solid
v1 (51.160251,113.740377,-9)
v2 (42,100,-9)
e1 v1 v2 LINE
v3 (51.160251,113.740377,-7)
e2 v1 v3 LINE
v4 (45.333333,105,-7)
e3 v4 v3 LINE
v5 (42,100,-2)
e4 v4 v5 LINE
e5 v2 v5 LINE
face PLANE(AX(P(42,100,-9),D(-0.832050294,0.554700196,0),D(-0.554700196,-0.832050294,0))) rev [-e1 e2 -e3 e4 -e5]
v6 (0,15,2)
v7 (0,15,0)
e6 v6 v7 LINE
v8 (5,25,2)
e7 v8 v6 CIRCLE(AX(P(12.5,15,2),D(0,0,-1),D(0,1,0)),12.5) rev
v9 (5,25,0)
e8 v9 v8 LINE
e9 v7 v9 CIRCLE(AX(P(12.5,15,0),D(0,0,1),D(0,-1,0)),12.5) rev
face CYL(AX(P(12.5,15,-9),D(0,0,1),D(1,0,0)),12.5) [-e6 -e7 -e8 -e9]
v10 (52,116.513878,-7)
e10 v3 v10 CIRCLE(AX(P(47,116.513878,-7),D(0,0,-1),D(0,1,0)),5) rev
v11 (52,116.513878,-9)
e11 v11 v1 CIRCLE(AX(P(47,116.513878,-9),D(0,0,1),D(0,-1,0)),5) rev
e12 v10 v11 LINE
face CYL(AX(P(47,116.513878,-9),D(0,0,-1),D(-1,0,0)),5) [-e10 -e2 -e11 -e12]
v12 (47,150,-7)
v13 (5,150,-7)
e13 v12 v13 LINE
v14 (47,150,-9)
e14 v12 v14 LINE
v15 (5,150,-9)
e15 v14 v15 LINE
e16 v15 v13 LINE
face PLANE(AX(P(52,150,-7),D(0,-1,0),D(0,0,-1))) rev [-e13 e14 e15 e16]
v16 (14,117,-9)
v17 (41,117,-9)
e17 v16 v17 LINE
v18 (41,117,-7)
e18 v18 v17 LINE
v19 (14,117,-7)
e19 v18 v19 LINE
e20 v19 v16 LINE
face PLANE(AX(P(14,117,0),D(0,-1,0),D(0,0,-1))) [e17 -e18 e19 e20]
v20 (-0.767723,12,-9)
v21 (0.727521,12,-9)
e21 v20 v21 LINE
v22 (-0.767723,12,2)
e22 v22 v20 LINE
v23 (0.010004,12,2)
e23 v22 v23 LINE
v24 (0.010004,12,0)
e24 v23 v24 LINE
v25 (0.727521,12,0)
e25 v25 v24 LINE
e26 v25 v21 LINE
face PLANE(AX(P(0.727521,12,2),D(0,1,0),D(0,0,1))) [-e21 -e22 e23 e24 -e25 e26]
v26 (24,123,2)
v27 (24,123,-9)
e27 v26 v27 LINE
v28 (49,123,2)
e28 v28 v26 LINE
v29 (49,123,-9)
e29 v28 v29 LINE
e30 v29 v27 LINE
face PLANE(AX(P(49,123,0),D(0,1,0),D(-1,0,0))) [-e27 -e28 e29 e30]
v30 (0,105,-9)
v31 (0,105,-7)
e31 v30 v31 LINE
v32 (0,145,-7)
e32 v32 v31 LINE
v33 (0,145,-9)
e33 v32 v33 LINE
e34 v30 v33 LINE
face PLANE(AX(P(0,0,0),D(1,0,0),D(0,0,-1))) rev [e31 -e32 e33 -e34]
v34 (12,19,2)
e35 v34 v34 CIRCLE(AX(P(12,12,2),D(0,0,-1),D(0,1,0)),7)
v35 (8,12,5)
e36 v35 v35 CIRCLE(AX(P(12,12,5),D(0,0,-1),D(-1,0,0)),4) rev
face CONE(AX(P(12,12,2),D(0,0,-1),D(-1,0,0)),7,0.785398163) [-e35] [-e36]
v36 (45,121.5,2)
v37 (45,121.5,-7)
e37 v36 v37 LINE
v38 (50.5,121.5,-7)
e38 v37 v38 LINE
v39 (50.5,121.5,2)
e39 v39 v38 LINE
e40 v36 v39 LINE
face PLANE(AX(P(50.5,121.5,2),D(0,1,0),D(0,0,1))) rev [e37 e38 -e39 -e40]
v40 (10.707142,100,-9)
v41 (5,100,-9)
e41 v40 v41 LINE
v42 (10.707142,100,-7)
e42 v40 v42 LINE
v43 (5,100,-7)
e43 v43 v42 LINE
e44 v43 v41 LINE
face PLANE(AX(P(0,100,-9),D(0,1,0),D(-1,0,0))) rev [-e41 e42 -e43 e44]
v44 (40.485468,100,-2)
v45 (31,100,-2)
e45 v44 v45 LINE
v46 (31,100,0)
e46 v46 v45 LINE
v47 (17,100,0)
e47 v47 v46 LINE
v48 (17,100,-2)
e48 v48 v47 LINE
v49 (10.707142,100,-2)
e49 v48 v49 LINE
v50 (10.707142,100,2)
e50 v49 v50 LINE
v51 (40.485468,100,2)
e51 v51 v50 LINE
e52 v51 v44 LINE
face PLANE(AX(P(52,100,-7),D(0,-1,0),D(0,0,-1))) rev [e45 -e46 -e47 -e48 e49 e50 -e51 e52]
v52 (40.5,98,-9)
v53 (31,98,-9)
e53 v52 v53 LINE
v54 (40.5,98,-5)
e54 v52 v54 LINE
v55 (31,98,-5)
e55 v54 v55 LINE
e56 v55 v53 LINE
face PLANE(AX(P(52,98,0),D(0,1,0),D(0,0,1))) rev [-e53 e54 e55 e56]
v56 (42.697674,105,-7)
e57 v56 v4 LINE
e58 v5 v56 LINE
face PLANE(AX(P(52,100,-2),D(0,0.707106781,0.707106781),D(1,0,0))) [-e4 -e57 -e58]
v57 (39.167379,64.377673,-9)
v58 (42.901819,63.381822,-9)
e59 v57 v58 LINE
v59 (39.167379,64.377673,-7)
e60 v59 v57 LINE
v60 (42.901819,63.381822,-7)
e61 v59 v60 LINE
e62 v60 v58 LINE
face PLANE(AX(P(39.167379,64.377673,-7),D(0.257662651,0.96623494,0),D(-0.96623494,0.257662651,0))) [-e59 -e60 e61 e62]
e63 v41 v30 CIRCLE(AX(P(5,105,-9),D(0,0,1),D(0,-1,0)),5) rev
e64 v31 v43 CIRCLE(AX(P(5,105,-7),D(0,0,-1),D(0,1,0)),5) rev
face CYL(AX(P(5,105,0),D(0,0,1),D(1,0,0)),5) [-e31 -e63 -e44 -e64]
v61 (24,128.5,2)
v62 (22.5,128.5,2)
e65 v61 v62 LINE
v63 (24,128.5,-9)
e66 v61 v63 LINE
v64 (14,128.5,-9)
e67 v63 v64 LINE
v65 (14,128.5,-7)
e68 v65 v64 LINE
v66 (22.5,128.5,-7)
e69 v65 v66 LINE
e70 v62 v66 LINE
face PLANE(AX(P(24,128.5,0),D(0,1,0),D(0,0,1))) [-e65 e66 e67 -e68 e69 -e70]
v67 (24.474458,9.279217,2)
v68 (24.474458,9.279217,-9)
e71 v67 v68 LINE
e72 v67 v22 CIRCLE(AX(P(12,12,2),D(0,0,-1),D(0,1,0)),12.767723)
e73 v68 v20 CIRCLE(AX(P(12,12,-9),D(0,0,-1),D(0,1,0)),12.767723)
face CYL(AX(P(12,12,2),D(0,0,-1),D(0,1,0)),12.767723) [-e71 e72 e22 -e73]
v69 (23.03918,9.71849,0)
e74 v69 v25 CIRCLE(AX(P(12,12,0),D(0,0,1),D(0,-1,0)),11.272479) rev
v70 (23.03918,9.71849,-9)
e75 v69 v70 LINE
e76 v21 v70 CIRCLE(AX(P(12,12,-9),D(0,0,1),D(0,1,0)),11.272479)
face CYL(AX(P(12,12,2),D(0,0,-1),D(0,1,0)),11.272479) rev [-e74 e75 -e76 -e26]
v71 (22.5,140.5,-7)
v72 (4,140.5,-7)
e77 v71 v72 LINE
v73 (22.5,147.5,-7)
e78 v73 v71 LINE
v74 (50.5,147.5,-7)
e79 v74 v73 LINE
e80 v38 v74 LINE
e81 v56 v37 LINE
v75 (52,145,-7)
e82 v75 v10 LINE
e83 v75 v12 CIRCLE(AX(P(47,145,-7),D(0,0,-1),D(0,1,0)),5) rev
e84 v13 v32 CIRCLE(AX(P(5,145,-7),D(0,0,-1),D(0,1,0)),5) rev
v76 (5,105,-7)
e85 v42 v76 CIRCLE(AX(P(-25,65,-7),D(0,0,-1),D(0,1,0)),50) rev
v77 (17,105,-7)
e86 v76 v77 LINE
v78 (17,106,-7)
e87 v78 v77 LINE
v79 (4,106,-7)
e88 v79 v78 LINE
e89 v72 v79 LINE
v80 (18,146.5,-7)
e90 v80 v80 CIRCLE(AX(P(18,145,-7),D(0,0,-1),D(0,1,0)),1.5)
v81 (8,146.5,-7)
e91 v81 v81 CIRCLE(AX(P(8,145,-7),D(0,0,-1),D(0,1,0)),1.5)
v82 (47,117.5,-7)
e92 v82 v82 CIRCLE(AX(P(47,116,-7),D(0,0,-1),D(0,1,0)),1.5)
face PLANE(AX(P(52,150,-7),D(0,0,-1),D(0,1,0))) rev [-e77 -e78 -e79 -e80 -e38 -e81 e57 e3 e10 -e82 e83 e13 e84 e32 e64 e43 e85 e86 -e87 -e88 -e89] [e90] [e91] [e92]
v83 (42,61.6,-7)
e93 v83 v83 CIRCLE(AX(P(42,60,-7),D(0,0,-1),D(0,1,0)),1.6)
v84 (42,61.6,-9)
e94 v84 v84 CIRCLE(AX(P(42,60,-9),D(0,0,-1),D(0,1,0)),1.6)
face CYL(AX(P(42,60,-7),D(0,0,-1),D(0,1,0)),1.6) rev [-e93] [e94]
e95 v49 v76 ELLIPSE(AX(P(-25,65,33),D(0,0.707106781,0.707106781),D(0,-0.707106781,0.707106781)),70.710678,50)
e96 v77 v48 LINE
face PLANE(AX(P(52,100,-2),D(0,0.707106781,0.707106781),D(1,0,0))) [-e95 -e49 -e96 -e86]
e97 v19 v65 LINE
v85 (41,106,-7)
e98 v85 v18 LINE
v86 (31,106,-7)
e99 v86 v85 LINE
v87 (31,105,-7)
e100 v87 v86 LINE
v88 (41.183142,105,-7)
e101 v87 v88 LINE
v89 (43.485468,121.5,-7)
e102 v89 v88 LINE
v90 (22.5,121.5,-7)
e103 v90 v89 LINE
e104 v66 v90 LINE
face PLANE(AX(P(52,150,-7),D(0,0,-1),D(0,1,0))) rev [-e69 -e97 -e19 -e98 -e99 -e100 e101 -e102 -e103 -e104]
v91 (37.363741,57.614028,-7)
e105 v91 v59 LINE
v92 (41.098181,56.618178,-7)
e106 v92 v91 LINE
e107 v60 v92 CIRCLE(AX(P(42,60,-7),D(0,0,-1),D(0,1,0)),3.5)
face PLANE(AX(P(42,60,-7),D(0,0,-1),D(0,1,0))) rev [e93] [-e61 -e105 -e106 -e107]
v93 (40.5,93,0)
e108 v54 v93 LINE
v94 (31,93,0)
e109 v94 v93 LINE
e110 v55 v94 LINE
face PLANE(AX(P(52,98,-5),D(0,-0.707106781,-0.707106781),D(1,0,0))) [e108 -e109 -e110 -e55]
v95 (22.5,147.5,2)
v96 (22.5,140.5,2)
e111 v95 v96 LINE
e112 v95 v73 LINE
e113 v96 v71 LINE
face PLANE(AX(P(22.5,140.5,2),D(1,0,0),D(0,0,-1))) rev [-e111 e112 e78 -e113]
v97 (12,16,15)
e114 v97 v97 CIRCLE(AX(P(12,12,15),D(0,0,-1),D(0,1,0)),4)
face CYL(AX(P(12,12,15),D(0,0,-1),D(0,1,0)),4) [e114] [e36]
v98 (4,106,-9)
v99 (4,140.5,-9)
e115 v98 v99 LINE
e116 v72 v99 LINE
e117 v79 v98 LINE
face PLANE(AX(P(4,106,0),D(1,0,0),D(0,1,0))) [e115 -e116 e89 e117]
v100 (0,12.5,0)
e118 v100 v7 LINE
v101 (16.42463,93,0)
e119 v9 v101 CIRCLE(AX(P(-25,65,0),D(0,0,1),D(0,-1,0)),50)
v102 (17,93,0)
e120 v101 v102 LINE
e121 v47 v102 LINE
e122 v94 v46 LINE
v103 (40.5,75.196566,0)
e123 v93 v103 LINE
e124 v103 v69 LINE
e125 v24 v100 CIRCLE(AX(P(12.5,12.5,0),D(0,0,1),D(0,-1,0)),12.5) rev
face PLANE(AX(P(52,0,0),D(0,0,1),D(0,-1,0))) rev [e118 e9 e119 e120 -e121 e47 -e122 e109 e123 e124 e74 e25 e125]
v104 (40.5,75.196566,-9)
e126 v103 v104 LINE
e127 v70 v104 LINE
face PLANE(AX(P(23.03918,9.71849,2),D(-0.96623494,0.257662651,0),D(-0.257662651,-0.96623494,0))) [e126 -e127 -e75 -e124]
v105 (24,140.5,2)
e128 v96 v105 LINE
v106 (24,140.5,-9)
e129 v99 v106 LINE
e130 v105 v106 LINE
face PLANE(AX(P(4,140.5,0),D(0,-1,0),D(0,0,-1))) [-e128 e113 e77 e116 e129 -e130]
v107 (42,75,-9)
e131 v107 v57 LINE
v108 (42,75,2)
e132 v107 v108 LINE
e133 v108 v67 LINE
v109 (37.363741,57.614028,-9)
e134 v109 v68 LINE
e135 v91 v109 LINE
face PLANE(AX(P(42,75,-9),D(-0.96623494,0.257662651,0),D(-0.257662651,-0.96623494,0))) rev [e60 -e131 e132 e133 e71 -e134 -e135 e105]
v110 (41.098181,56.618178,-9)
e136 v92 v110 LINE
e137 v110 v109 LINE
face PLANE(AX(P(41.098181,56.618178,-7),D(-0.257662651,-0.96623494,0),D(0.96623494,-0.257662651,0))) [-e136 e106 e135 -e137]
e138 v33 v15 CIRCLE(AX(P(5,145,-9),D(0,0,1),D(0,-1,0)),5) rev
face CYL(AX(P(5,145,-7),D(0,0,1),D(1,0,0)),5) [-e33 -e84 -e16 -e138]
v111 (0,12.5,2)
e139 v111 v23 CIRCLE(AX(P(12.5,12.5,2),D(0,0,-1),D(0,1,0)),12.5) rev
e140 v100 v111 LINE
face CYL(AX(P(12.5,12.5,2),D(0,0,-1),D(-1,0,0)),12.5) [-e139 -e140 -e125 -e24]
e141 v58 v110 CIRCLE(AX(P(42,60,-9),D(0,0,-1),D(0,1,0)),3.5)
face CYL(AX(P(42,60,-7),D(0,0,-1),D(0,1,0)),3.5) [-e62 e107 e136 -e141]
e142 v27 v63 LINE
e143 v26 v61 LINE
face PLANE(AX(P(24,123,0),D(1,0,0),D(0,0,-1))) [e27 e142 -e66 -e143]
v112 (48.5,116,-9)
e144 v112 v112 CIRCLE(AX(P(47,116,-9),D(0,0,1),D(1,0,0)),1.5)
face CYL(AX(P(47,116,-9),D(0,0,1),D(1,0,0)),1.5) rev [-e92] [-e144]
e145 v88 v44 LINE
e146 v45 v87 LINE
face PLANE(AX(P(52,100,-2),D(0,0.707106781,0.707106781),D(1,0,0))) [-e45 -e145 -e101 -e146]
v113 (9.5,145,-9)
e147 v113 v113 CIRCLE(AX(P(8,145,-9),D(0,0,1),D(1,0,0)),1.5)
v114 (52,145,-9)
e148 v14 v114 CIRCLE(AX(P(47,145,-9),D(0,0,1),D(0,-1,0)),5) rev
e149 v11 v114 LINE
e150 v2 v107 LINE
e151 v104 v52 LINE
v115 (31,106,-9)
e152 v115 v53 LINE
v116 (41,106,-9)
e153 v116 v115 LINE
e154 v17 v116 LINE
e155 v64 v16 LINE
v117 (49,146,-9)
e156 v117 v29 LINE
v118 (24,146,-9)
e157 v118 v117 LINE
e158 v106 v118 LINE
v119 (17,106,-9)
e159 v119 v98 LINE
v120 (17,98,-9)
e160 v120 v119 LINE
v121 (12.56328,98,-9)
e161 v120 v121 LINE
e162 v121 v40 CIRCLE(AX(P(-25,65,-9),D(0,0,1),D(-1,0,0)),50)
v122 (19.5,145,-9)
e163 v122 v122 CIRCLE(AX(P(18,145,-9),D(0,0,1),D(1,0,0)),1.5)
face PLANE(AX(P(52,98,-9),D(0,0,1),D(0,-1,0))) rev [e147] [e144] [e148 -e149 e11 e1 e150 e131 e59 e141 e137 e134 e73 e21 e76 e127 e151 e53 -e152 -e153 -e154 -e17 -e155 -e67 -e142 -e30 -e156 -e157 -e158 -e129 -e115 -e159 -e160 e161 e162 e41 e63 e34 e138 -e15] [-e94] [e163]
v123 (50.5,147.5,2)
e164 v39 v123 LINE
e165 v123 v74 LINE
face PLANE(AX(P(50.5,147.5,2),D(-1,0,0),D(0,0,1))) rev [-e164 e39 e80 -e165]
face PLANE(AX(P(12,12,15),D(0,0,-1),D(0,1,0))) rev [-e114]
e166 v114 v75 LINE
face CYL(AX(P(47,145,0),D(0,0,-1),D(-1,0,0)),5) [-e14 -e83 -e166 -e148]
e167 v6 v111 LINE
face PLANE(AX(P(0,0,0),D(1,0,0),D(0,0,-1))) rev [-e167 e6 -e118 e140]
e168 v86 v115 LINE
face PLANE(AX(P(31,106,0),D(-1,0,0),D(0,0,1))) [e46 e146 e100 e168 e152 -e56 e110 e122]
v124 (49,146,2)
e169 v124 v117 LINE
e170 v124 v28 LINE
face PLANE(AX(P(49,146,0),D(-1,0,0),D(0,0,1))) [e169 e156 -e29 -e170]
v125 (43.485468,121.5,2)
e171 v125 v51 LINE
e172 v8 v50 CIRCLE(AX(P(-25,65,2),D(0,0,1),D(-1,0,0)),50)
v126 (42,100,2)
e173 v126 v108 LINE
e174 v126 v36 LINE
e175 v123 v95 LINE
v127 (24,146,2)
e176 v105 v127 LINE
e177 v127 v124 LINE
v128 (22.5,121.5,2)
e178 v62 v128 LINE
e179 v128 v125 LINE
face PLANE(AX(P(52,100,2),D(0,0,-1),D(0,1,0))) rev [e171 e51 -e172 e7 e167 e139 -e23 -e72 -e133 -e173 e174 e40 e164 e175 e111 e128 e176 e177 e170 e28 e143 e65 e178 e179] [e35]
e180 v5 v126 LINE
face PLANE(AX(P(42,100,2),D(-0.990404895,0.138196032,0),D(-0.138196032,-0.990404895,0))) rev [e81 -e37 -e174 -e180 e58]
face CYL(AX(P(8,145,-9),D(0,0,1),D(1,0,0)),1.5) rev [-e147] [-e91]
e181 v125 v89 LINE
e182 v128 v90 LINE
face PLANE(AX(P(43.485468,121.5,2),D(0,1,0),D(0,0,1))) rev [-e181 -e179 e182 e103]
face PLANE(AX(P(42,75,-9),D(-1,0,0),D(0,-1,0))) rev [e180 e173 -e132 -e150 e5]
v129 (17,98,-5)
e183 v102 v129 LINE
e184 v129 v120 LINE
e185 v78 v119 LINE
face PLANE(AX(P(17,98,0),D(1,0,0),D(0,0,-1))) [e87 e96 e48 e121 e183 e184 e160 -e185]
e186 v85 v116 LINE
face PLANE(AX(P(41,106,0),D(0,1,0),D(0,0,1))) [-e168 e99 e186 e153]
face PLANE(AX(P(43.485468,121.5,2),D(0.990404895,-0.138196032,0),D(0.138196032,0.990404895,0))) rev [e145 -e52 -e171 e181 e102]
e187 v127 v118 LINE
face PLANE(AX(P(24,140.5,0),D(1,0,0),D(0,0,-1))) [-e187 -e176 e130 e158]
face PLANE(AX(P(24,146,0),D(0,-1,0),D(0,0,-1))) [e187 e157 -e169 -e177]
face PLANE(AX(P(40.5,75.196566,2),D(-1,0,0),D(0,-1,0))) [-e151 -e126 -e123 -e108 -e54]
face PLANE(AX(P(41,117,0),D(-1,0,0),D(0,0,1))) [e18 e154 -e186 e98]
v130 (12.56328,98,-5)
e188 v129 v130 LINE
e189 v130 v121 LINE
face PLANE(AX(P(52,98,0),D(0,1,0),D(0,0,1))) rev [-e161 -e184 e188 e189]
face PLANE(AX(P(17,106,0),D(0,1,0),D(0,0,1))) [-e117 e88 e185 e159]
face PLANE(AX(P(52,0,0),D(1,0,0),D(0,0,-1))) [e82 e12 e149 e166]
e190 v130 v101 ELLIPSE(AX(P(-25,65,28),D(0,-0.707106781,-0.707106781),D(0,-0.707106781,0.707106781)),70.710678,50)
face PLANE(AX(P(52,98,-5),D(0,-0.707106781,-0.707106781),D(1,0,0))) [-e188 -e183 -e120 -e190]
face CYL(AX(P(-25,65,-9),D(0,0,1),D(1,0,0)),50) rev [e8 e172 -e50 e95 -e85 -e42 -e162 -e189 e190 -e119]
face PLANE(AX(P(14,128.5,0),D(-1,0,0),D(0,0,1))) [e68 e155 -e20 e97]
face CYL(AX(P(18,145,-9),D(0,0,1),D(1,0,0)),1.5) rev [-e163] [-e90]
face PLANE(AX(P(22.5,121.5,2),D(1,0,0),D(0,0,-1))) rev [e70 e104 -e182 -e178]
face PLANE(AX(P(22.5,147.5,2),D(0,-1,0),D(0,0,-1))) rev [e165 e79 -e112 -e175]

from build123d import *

# Parameters (mm, degrees)
EXTRUDE_1_DEPTH                 = 52
CUT_EXTRUDE_1_REACH             = 161.013
CUT_EXTRUDE_1_DIRECTION_2_DEPTH = 7
SKETCH_3_R                      = 1.5
CUT_EXTRUDE_2_DEPTH             = 160.138304628
SKETCH_5_R                      = 4
EXTRUDE_3_DEPTH                 = 15
FILLET_1_R                      = 5
CHAMFER_1_SIZE                  = 5
FILLET_2_R                      = 12.5
EXTRUDE_2_DEPTH                 = 9
CHAMFER_2_SIZE                  = 5
EXTRUDE_4_DEPTH                 = 9
EXTRUDE_4_DEPTH_BACK            = 2
CHAMFER_3_SIZE                  = 3
SKETCH_7_R                      = 1.6
EXTRUDE_5_DEPTH                 = 2


with BuildPart() as part:
    # 草图1 → 凸台-拉伸1 (new body)
    with BuildSketch(Plane(origin=(0, 0, 0), x_dir=(0, 0, -1), z_dir=(1, 0, 0))):
        Polygon((0, 0), (0, 98), (9, 98), (9, 150), (7, 150), (7, 100), (-2, 100), (-2, 0), align=None)
    extrude(amount=EXTRUDE_1_DEPTH)

    # 草图2 → 切除-拉伸1 (cut, up to next)
    with BuildSketch(Plane.XY.offset(-7), mode=Mode.PRIVATE) as cut_extrude_1_sk1:
        Polygon((24, 146), (49, 146), (49, 123), (24, 123), (24, 128.5), (14, 128.5), (14, 117), (41, 117), (41, 106), (31, 106), (31, 98), (17, 98), (17, 106), (4, 106), (4, 140.5), (24, 140.5), align=None)
    cut_extrude_1_tool1 = extrude(cut_extrude_1_sk1.sketch, amount=-CUT_EXTRUDE_1_REACH, mode=Mode.PRIVATE) & part.part
    add(cut_extrude_1_tool1.solids().sort_by_distance((25.692202, 124.595066, -7))[0], mode=Mode.SUBTRACT)

    # 草图2 → 切除-拉伸1 direction 2 (cut)
    with BuildSketch(Plane.XY.offset(-7)):
        Polygon((24, 146), (49, 146), (49, 123), (24, 123), (24, 128.5), (14, 128.5), (14, 117), (41, 117), (41, 106), (31, 106), (31, 98), (17, 98), (17, 106), (4, 106), (4, 140.5), (24, 140.5), align=None)
    extrude(amount=CUT_EXTRUDE_1_DIRECTION_2_DEPTH, mode=Mode.SUBTRACT)

    # 草图3 → 切除-拉伸2 (cut, through all)
    with BuildSketch(Plane.XY.offset(2)):
        with Locations((8, 145)):
            Circle(SKETCH_3_R)
        with Locations((18, 145)):
            Circle(SKETCH_3_R)
        with Locations((47, 116)):
            Circle(SKETCH_3_R)
        with BuildLine():
            Line((0, 100), (10.707142143, 100))
            ThreePointArc((10.707142143, 100), (24.538989746, 58.225895269), (0, 21.698729811))
            Line((0, 21.698729811), (0, 100))
        make_face()
        Polygon((42, 75), (42, 100), (52, 115), (52, 0), (22, 0), align=None)
    extrude(amount=-CUT_EXTRUDE_2_DEPTH, mode=Mode.SUBTRACT)

    # 草图5 → 凸台-拉伸3 (add)
    with BuildSketch(Plane(origin=(0, 0, 0), x_dir=(-1, 0, 0), z_dir=(0, 0, -1))):
        with Locations(Location((-12, 12, 0), (0, 0, 90))):
            Circle(SKETCH_5_R)
    extrude(amount=-EXTRUDE_3_DEPTH)

    # 圆角1
    fillet_1_edges = [part.edges().sort_by_distance(p)[0] for p in [
        (52, 115, -8),
        (0, 100, -8),
        (52, 150, -8),
        (0, 150, -8),
    ]]
    fillet(fillet_1_edges, radius=FILLET_1_R)

    # 倒角1
    chamfer_1_edges = [part.edges().sort_by_distance(p)[0] for p in [
        (13.853571071, 100, -7),
        (36.5, 100, -7),
    ]]
    chamfer(chamfer_1_edges, length=CHAMFER_1_SIZE)

    # 圆角2
    # the kernel refuses this fillet: 12.5 mm, written as the material it takes off along each edge
    with BuildSketch(Plane(origin=(0, 0, 33.25), x_dir=(1, 0, 0), z_dir=(0, 0, -1))) as fillet_2_piece_1:
        with BuildLine():
            CenterArc((FILLET_2_R, -FILLET_2_R), FILLET_2_R, 90, 90)
            Line((0, -FILLET_2_R), (0, 0))
            Line((0, 0), (FILLET_2_R, 0))
        make_face()
    extrude(amount=64.5, mode=Mode.SUBTRACT)
    with BuildSketch(Plane(origin=(22, 0, 26.008697284), x_dir=(0.2576626505603325, 0.9662349396012462, 0), z_dir=(0, 0, -1))) as fillet_2_piece_2:
        with BuildLine():
            CenterArc((FILLET_2_R * 0.768278313084, -FILLET_2_R), FILLET_2_R, 90, 75.068582822)
            Line((-FILLET_2_R * 0.197956626517, -FILLET_2_R * 0.74233734944), (0, 0))
            Line((0, 0), (FILLET_2_R * 0.768278313084, 0))
        make_face()
    extrude(amount=50.017394568, mode=Mode.SUBTRACT)
    with BuildSketch(Plane(origin=(0, 21.698729811, 18.746824527), x_dir=(0.8345119301206998, 0.550989871491504, 0), z_dir=(0, 0, -1))) as fillet_2_piece_3:
        with BuildLine():
            CenterArc((6.740466849, 12.477543337), FILLET_2_R, 213.434948823, 53.130102354)
            Line((-3.690932278, 5.590169944), (0, 0))
            ThreePointArc((0, 0), (2.995763044, 0.08982665), (5.991526088, 0))
        make_face()
    extrude(amount=35.493649054, mode=Mode.SUBTRACT)

    # 草图4 → 凸台-拉伸2 (add)
    with BuildSketch(Plane.XY.offset(-7)):
        Polygon((24, 128.5), (24, 123), (49, 123), (49, 146), (24, 146), (24, 140.5), (22.5, 140.5), (22.5, 147.5), (50.5, 147.5), (50.5, 121.5), (45, 121.5), (42, 100), (40.485467906, 100), (43.485467906, 121.5), (22.5, 121.5), (22.5, 128.5), align=None)
    extrude(amount=EXTRUDE_2_DEPTH)

    # 倒角2
    chamfer_2_edges = [part.edges().sort_by_distance(p)[0] for p in [
        (14.781639971, 98, 0),
        (36.5, 98, 0),
    ]]
    chamfer(chamfer_2_edges, length=CHAMFER_2_SIZE)

    # 草图6 → 凸台-拉伸4 (add, two sides: drawn at the far end of the back side and taken through both)
    with BuildSketch(Plane(origin=(0, 0, 0), x_dir=(-1, 0, 0), z_dir=(0, 0, -1)).offset(-EXTRUDE_4_DEPTH_BACK)):
        with BuildLine():
            Line((-40.5, 100), (-42, 100))
            Line((-42, 100), (-42, 75))
            Line((-42, 75), (-24.474457831, 9.279216868))
            ThreePointArc((-24.474457831, 9.279216868), (-10.631728691, -0.694195235), (0.76772333, 12))
            Line((0.76772333, 12), (-0.727521137, 12))
            ThreePointArc((-0.727521137, 12), (-10.853296347, 0.785997572), (-23.03917982, 9.718489836))
            Line((-23.03917982, 9.718489836), (-40.5, 75.196565511))
            Line((-40.5, 75.196565511), (-40.5, 100))
        make_face()
    extrude(amount=EXTRUDE_4_DEPTH + EXTRUDE_4_DEPTH_BACK)

    # 倒角3
    chamfer_3_edges = [part.edges().sort_by_distance(p)[0] for p in [
        (12, 8, 2),
    ]]
    chamfer(chamfer_3_edges, length=CHAMFER_3_SIZE)

    # 草图7 → 凸台-拉伸5 (add)
    with BuildSketch(Plane(origin=(0, 0, -9), x_dir=(-1, 0, 0), z_dir=(0, 0, -1))):
        with BuildLine():
            Line((-39.167379443, 64.377672911), (-42.901819277, 63.381822289))
            ThreePointArc((-42.901819277, 63.381822289), (-45.381822289, 59.098180723), (-41.098180723, 56.618177711))
            Line((-41.098180723, 56.618177711), (-37.363740889, 57.614028334))
            Line((-37.363740889, 57.614028334), (-39.167379443, 64.377672911))
        make_face()
        with Locations(Location((-42, 60, 0), (0, 0, 90))):
            Circle(SKETCH_7_R, mode=Mode.SUBTRACT)
    extrude(amount=-EXTRUDE_5_DEPTH)


solid = part.part
